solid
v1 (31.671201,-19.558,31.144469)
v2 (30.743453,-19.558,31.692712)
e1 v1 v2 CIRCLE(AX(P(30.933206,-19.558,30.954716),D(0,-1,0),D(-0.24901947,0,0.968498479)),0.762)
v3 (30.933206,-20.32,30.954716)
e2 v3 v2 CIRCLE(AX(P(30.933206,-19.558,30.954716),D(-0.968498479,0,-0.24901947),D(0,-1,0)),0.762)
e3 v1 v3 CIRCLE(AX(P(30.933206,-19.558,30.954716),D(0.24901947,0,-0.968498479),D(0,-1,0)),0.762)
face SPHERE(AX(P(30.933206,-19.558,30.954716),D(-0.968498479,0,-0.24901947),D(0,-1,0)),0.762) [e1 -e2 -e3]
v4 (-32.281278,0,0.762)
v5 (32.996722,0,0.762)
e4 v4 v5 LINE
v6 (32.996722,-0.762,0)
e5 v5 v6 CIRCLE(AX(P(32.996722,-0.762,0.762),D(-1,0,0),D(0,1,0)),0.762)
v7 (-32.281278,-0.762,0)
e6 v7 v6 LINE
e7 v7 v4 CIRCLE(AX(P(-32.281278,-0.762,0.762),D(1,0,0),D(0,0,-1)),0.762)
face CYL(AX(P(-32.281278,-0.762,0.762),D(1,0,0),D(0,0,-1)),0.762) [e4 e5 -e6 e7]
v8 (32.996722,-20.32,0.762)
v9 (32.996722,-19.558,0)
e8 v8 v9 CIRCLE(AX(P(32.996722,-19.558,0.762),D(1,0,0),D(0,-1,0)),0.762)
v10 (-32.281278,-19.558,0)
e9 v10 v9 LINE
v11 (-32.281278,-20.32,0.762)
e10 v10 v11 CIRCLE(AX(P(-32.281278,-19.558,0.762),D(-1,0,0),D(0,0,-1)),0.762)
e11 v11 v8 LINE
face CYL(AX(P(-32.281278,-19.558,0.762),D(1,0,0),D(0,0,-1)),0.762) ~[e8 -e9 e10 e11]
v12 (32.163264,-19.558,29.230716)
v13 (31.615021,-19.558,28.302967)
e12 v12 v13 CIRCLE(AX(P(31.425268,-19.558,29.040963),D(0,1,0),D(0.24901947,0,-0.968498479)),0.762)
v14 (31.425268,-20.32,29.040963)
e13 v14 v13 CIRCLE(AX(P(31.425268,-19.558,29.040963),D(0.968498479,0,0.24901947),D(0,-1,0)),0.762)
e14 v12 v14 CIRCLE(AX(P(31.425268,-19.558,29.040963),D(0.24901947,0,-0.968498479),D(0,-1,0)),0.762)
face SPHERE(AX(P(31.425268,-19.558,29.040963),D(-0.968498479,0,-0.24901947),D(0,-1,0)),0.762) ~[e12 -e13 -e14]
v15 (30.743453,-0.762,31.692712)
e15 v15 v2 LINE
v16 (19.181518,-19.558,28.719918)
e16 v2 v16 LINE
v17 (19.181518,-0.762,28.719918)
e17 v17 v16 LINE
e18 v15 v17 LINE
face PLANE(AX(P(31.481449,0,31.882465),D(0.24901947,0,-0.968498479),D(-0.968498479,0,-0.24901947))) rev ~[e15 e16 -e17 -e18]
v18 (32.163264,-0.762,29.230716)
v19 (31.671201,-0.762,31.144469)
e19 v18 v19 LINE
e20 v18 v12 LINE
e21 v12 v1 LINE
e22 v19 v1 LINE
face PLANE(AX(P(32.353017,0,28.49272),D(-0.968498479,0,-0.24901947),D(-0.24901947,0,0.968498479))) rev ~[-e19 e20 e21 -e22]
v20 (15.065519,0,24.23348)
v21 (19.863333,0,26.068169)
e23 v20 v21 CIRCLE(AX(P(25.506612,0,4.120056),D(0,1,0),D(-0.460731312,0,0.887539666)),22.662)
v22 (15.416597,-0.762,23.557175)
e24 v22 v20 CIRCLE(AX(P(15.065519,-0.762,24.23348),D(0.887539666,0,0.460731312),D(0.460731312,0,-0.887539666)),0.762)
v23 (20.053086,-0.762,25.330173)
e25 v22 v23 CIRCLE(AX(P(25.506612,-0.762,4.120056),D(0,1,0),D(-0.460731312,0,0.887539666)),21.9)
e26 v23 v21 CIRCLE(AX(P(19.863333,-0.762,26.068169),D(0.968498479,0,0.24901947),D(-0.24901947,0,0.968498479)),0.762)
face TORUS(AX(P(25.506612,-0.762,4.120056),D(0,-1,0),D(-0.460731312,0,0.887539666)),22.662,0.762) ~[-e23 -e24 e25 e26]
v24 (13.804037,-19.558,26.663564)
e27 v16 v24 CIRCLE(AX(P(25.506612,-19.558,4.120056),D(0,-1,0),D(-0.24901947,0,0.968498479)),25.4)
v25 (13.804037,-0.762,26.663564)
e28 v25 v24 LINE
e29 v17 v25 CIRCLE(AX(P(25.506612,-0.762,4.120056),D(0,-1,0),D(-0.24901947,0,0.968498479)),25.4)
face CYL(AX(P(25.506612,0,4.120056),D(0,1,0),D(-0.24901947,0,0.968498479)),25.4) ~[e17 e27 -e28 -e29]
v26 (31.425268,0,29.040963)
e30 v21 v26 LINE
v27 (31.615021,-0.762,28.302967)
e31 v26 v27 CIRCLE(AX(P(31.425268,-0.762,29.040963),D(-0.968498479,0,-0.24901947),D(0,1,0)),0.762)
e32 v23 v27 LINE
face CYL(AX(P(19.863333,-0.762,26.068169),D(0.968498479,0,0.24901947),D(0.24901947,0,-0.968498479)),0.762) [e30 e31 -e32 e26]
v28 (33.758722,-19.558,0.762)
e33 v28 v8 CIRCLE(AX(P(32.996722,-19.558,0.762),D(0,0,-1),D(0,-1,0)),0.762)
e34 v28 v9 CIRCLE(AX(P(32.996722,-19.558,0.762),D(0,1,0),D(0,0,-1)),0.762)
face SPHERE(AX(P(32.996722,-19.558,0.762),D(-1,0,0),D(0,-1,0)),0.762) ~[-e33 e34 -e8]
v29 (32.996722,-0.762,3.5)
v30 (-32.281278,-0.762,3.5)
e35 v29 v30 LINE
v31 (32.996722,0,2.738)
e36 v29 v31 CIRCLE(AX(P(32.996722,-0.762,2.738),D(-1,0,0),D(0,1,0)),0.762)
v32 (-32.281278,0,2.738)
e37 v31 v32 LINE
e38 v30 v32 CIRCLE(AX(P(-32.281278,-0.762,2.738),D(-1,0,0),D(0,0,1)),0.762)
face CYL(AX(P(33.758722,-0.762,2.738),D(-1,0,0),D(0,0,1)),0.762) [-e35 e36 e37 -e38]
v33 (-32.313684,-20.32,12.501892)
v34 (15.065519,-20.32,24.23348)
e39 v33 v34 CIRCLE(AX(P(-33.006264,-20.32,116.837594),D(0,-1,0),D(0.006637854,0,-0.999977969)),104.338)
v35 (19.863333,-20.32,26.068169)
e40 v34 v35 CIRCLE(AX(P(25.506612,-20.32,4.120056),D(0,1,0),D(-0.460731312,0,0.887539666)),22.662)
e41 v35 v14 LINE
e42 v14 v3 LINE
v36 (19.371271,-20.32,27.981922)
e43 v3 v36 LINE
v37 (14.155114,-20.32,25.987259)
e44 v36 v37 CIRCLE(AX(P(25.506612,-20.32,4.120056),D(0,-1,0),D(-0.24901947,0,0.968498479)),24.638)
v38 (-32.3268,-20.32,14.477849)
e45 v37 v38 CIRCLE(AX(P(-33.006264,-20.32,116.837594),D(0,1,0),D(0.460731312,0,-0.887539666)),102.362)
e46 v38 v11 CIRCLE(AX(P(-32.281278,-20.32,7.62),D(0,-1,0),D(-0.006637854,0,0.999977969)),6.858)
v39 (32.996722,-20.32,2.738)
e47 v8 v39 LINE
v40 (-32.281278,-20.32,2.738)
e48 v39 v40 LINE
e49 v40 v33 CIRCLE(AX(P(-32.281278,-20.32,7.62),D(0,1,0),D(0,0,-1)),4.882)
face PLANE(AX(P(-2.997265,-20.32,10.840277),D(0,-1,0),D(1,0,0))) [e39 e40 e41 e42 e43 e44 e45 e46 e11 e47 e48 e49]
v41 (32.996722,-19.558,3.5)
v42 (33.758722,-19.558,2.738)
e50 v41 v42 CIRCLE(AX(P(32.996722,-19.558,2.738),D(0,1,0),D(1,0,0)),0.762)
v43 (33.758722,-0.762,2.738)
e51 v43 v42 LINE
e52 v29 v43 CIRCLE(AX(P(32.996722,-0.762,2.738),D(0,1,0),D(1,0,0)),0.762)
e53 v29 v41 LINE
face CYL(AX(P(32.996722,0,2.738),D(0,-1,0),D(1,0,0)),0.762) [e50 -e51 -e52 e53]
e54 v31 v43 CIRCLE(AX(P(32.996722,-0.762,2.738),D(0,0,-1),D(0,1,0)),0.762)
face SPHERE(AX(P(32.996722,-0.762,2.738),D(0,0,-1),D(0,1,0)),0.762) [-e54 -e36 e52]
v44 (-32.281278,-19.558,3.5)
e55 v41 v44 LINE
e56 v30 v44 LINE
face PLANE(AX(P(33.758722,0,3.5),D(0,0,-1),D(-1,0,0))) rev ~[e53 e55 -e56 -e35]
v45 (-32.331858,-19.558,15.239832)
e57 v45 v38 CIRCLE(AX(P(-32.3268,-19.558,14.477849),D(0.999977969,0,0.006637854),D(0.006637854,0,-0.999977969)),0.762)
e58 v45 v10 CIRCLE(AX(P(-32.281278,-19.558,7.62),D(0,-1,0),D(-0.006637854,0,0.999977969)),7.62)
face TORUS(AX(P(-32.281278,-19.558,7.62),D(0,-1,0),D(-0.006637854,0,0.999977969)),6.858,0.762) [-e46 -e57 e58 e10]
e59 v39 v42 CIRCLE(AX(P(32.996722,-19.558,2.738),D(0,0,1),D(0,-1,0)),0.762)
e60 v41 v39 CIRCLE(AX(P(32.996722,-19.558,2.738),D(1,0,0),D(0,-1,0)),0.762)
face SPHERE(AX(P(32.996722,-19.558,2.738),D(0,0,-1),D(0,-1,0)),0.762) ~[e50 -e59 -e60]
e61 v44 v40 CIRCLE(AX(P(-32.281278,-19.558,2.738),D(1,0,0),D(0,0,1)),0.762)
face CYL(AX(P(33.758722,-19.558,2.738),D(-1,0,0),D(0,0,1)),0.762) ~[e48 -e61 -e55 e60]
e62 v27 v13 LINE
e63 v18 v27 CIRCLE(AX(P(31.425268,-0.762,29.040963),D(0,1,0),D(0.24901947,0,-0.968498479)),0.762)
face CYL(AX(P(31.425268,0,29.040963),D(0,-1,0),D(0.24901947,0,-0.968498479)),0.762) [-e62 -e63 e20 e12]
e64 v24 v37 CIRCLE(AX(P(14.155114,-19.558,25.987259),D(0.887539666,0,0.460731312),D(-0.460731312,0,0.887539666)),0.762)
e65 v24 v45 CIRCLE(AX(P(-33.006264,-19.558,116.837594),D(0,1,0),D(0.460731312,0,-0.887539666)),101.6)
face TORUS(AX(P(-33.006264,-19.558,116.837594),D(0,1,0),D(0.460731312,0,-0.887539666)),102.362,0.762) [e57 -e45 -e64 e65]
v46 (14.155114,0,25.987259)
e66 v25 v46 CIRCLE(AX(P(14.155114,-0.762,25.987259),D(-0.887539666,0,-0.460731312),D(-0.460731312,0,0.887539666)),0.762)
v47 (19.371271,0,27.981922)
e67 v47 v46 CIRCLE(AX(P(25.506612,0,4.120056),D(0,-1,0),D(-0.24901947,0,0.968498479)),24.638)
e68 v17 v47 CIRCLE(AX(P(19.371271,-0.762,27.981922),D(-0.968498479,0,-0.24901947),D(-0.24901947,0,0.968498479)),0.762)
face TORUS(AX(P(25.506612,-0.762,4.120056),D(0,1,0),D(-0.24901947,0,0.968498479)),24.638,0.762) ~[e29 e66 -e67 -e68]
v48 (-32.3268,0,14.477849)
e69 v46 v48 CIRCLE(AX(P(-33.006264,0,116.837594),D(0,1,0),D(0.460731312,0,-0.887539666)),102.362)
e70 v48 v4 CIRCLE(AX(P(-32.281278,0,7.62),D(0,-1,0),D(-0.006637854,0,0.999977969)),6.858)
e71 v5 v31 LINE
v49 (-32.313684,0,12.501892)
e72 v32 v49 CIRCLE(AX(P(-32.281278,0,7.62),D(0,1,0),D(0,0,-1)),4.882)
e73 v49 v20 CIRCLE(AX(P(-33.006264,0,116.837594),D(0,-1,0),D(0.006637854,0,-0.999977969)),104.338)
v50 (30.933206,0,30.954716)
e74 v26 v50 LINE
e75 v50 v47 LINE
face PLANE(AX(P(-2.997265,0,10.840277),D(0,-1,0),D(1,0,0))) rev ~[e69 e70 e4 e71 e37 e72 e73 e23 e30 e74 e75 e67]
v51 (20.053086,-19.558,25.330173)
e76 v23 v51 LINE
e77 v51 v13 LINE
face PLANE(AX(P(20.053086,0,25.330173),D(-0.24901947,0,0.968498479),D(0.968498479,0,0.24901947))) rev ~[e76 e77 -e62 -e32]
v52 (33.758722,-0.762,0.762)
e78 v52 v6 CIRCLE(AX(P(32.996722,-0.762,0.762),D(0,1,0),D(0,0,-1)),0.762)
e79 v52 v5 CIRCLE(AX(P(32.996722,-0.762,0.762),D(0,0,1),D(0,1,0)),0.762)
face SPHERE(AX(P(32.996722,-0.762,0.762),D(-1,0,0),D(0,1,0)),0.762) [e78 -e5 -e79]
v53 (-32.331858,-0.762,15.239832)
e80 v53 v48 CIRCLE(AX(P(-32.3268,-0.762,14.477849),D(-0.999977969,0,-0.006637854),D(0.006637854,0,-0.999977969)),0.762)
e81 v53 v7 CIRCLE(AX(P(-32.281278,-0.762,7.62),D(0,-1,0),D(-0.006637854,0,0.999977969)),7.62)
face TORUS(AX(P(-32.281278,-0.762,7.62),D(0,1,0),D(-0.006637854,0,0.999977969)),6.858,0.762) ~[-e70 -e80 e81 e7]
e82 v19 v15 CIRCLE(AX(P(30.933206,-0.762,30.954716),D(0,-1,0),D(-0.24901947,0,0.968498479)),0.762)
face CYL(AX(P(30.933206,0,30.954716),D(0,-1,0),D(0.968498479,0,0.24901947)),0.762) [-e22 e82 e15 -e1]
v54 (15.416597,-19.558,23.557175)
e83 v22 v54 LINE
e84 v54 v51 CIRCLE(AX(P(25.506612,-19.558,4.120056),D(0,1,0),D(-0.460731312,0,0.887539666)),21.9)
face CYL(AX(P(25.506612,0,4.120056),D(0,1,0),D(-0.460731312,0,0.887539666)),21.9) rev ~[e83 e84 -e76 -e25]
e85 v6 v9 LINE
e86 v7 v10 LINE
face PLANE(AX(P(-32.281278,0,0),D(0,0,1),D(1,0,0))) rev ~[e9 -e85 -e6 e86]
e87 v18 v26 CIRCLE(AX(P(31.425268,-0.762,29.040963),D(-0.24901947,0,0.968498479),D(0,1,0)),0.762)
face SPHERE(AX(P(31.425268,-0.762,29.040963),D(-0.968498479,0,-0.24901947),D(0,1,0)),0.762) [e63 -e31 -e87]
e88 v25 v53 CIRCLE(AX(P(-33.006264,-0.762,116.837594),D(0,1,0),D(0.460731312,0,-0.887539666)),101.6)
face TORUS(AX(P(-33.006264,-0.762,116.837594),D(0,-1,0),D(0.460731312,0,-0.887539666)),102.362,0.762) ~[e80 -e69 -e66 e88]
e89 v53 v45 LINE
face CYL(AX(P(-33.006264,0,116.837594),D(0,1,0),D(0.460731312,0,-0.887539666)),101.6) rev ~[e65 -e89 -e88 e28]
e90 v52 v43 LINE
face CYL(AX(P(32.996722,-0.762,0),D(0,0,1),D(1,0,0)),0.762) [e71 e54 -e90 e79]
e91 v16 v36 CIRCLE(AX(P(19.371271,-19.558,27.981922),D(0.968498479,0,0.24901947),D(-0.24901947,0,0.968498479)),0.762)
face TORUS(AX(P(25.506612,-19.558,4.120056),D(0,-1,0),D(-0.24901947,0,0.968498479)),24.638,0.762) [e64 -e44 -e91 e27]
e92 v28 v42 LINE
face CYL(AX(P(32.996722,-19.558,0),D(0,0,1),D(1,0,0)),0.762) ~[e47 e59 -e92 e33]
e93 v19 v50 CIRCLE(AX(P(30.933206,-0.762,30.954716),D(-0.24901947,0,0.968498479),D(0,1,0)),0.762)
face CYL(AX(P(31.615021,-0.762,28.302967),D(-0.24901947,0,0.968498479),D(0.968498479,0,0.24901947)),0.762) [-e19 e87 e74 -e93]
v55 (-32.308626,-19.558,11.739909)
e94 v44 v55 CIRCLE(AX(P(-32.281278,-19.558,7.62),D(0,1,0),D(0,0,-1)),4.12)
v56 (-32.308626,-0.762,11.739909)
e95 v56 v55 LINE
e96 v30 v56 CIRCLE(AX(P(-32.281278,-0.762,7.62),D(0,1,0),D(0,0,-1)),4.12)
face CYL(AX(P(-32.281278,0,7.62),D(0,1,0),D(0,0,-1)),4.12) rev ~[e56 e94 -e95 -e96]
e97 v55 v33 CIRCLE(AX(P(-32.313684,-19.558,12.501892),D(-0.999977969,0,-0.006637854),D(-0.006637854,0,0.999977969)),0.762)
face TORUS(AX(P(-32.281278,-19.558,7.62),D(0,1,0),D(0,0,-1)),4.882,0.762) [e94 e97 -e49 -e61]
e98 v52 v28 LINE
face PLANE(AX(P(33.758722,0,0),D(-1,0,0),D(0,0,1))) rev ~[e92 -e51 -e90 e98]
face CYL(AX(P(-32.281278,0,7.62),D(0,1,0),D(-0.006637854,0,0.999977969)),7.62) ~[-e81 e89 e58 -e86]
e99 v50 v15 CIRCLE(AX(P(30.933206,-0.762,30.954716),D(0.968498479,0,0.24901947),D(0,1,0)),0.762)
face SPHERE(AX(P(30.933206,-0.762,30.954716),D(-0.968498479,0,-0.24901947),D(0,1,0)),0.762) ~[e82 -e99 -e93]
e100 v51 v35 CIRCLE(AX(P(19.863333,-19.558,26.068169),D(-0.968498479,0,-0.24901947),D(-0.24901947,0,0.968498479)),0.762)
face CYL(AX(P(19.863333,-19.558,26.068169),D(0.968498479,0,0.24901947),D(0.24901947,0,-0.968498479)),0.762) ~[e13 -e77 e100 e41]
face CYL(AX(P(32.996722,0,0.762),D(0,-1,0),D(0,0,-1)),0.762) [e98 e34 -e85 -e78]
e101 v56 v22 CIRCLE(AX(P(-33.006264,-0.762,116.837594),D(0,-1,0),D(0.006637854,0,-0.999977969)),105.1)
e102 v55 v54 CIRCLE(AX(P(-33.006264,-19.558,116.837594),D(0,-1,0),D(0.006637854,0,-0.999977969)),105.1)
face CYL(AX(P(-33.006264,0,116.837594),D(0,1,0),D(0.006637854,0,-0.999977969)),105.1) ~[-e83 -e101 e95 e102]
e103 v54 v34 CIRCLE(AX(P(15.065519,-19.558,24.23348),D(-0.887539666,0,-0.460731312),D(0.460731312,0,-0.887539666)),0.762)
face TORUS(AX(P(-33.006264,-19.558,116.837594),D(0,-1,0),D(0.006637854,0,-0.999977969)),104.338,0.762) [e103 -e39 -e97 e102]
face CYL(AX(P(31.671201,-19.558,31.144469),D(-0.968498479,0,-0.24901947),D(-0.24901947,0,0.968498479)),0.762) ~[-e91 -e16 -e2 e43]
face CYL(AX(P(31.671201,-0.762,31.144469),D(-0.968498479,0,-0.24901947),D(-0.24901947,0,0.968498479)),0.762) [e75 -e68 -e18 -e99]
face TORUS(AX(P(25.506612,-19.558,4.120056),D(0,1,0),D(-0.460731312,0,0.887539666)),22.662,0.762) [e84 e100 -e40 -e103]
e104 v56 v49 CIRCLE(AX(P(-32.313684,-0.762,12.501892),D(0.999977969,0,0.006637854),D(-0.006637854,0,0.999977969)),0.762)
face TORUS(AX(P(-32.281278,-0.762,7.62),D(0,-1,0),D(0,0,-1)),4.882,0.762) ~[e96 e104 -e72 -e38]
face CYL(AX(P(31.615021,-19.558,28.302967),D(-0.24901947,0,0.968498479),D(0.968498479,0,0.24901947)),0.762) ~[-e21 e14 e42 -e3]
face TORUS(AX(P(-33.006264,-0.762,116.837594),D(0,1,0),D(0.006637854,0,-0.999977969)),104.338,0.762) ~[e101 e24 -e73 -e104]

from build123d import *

# Parameters (mm, degrees)
F1_DEPTH = 20.32
F2_R     = 0.762


with BuildPart() as f1:
    # F0 (on Front) → F1 (new body)
    with BuildSketch(Plane.XZ):
        with BuildLine():
            Line((-32.2812777423, 0), (33.7587222577, 0))
            Line((33.7587222577, 0), (33.7587222577, 3.5))
            Line((33.7587222577, 3.5), (-32.2812777423, 3.5))
            ThreePointArc((-32.2812777423, 3.5), (-36.4012550506, 7.6063259449), (-32.308625702, 11.7399092331))
            ThreePointArc((-32.308625702, 11.7399092331), (-7.7452704082, 14.8185162016), (15.4165966965, 23.5571749303))
            ThreePointArc((15.4165966965, 23.5571749303), (17.6844448263, 24.575463703), (20.0530860269, 25.3301729364))
            Line((20.0530860269, 25.3301729364), (32.3530167072, 28.49272021))
            Line((32.3530167072, 28.49272021), (31.481448561, 31.8824648857))
            Line((31.481448561, 31.8824648857), (19.1815178806, 28.7199176121))
            ThreePointArc((19.1815178806, 28.7199176121), (16.4343267164, 27.8445927478), (13.8040371048, 26.6635637603))
            ThreePointArc((13.8040371048, 26.6635637603), (-8.5865023609, 18.215916502), (-32.331858192, 15.2398321253))
            ThreePointArc((-32.331858192, 15.2398321253), (-39.9012357736, 7.5947096359), (-32.2812777423, 0))
        make_face()
    extrude(amount=F1_DEPTH)

    # F2
    f2_edges = [f1.edges().sort_by_distance(p)[0] for p in [
        (16.434327, -20.32, 27.844593),
        (-8.586502, -20.32, 18.215917),
        (-39.901236, -20.32, 7.59471),
        (0.738722, -20.32, 0),
        (33.758722, -20.32, 1.75),
        (0.738722, -20.32, 3.5),
        (-36.401255, -20.32, 7.606326),
        (-7.74527, -20.32, 14.818516),
        (17.684445, -20.32, 24.575464),
        (26.203051, -20.32, 26.911447),
        (31.917233, -20.32, 30.187593),
        (25.331483, -20.32, 30.301191),
        (16.434327, 0, 27.844593),
        (-8.586502, 0, 18.215917),
        (-39.901236, 0, 7.59471),
        (0.738722, 0, 0),
        (33.758722, 0, 1.75),
        (0.738722, 0, 3.5),
        (-36.401255, 0, 7.606326),
        (-7.74527, 0, 14.818516),
        (17.684445, 0, 24.575464),
        (26.203051, 0, 26.911447),
        (31.917233, 0, 30.187593),
        (25.331483, 0, 30.301191),
        (32.353017, -10.16, 28.49272),
        (31.481449, -10.16, 31.882465),
        (33.758722, -10.16, 0),
        (33.758722, -10.16, 3.5),
    ]]
    fillet(f2_edges, radius=F2_R)


solid = f1.part
